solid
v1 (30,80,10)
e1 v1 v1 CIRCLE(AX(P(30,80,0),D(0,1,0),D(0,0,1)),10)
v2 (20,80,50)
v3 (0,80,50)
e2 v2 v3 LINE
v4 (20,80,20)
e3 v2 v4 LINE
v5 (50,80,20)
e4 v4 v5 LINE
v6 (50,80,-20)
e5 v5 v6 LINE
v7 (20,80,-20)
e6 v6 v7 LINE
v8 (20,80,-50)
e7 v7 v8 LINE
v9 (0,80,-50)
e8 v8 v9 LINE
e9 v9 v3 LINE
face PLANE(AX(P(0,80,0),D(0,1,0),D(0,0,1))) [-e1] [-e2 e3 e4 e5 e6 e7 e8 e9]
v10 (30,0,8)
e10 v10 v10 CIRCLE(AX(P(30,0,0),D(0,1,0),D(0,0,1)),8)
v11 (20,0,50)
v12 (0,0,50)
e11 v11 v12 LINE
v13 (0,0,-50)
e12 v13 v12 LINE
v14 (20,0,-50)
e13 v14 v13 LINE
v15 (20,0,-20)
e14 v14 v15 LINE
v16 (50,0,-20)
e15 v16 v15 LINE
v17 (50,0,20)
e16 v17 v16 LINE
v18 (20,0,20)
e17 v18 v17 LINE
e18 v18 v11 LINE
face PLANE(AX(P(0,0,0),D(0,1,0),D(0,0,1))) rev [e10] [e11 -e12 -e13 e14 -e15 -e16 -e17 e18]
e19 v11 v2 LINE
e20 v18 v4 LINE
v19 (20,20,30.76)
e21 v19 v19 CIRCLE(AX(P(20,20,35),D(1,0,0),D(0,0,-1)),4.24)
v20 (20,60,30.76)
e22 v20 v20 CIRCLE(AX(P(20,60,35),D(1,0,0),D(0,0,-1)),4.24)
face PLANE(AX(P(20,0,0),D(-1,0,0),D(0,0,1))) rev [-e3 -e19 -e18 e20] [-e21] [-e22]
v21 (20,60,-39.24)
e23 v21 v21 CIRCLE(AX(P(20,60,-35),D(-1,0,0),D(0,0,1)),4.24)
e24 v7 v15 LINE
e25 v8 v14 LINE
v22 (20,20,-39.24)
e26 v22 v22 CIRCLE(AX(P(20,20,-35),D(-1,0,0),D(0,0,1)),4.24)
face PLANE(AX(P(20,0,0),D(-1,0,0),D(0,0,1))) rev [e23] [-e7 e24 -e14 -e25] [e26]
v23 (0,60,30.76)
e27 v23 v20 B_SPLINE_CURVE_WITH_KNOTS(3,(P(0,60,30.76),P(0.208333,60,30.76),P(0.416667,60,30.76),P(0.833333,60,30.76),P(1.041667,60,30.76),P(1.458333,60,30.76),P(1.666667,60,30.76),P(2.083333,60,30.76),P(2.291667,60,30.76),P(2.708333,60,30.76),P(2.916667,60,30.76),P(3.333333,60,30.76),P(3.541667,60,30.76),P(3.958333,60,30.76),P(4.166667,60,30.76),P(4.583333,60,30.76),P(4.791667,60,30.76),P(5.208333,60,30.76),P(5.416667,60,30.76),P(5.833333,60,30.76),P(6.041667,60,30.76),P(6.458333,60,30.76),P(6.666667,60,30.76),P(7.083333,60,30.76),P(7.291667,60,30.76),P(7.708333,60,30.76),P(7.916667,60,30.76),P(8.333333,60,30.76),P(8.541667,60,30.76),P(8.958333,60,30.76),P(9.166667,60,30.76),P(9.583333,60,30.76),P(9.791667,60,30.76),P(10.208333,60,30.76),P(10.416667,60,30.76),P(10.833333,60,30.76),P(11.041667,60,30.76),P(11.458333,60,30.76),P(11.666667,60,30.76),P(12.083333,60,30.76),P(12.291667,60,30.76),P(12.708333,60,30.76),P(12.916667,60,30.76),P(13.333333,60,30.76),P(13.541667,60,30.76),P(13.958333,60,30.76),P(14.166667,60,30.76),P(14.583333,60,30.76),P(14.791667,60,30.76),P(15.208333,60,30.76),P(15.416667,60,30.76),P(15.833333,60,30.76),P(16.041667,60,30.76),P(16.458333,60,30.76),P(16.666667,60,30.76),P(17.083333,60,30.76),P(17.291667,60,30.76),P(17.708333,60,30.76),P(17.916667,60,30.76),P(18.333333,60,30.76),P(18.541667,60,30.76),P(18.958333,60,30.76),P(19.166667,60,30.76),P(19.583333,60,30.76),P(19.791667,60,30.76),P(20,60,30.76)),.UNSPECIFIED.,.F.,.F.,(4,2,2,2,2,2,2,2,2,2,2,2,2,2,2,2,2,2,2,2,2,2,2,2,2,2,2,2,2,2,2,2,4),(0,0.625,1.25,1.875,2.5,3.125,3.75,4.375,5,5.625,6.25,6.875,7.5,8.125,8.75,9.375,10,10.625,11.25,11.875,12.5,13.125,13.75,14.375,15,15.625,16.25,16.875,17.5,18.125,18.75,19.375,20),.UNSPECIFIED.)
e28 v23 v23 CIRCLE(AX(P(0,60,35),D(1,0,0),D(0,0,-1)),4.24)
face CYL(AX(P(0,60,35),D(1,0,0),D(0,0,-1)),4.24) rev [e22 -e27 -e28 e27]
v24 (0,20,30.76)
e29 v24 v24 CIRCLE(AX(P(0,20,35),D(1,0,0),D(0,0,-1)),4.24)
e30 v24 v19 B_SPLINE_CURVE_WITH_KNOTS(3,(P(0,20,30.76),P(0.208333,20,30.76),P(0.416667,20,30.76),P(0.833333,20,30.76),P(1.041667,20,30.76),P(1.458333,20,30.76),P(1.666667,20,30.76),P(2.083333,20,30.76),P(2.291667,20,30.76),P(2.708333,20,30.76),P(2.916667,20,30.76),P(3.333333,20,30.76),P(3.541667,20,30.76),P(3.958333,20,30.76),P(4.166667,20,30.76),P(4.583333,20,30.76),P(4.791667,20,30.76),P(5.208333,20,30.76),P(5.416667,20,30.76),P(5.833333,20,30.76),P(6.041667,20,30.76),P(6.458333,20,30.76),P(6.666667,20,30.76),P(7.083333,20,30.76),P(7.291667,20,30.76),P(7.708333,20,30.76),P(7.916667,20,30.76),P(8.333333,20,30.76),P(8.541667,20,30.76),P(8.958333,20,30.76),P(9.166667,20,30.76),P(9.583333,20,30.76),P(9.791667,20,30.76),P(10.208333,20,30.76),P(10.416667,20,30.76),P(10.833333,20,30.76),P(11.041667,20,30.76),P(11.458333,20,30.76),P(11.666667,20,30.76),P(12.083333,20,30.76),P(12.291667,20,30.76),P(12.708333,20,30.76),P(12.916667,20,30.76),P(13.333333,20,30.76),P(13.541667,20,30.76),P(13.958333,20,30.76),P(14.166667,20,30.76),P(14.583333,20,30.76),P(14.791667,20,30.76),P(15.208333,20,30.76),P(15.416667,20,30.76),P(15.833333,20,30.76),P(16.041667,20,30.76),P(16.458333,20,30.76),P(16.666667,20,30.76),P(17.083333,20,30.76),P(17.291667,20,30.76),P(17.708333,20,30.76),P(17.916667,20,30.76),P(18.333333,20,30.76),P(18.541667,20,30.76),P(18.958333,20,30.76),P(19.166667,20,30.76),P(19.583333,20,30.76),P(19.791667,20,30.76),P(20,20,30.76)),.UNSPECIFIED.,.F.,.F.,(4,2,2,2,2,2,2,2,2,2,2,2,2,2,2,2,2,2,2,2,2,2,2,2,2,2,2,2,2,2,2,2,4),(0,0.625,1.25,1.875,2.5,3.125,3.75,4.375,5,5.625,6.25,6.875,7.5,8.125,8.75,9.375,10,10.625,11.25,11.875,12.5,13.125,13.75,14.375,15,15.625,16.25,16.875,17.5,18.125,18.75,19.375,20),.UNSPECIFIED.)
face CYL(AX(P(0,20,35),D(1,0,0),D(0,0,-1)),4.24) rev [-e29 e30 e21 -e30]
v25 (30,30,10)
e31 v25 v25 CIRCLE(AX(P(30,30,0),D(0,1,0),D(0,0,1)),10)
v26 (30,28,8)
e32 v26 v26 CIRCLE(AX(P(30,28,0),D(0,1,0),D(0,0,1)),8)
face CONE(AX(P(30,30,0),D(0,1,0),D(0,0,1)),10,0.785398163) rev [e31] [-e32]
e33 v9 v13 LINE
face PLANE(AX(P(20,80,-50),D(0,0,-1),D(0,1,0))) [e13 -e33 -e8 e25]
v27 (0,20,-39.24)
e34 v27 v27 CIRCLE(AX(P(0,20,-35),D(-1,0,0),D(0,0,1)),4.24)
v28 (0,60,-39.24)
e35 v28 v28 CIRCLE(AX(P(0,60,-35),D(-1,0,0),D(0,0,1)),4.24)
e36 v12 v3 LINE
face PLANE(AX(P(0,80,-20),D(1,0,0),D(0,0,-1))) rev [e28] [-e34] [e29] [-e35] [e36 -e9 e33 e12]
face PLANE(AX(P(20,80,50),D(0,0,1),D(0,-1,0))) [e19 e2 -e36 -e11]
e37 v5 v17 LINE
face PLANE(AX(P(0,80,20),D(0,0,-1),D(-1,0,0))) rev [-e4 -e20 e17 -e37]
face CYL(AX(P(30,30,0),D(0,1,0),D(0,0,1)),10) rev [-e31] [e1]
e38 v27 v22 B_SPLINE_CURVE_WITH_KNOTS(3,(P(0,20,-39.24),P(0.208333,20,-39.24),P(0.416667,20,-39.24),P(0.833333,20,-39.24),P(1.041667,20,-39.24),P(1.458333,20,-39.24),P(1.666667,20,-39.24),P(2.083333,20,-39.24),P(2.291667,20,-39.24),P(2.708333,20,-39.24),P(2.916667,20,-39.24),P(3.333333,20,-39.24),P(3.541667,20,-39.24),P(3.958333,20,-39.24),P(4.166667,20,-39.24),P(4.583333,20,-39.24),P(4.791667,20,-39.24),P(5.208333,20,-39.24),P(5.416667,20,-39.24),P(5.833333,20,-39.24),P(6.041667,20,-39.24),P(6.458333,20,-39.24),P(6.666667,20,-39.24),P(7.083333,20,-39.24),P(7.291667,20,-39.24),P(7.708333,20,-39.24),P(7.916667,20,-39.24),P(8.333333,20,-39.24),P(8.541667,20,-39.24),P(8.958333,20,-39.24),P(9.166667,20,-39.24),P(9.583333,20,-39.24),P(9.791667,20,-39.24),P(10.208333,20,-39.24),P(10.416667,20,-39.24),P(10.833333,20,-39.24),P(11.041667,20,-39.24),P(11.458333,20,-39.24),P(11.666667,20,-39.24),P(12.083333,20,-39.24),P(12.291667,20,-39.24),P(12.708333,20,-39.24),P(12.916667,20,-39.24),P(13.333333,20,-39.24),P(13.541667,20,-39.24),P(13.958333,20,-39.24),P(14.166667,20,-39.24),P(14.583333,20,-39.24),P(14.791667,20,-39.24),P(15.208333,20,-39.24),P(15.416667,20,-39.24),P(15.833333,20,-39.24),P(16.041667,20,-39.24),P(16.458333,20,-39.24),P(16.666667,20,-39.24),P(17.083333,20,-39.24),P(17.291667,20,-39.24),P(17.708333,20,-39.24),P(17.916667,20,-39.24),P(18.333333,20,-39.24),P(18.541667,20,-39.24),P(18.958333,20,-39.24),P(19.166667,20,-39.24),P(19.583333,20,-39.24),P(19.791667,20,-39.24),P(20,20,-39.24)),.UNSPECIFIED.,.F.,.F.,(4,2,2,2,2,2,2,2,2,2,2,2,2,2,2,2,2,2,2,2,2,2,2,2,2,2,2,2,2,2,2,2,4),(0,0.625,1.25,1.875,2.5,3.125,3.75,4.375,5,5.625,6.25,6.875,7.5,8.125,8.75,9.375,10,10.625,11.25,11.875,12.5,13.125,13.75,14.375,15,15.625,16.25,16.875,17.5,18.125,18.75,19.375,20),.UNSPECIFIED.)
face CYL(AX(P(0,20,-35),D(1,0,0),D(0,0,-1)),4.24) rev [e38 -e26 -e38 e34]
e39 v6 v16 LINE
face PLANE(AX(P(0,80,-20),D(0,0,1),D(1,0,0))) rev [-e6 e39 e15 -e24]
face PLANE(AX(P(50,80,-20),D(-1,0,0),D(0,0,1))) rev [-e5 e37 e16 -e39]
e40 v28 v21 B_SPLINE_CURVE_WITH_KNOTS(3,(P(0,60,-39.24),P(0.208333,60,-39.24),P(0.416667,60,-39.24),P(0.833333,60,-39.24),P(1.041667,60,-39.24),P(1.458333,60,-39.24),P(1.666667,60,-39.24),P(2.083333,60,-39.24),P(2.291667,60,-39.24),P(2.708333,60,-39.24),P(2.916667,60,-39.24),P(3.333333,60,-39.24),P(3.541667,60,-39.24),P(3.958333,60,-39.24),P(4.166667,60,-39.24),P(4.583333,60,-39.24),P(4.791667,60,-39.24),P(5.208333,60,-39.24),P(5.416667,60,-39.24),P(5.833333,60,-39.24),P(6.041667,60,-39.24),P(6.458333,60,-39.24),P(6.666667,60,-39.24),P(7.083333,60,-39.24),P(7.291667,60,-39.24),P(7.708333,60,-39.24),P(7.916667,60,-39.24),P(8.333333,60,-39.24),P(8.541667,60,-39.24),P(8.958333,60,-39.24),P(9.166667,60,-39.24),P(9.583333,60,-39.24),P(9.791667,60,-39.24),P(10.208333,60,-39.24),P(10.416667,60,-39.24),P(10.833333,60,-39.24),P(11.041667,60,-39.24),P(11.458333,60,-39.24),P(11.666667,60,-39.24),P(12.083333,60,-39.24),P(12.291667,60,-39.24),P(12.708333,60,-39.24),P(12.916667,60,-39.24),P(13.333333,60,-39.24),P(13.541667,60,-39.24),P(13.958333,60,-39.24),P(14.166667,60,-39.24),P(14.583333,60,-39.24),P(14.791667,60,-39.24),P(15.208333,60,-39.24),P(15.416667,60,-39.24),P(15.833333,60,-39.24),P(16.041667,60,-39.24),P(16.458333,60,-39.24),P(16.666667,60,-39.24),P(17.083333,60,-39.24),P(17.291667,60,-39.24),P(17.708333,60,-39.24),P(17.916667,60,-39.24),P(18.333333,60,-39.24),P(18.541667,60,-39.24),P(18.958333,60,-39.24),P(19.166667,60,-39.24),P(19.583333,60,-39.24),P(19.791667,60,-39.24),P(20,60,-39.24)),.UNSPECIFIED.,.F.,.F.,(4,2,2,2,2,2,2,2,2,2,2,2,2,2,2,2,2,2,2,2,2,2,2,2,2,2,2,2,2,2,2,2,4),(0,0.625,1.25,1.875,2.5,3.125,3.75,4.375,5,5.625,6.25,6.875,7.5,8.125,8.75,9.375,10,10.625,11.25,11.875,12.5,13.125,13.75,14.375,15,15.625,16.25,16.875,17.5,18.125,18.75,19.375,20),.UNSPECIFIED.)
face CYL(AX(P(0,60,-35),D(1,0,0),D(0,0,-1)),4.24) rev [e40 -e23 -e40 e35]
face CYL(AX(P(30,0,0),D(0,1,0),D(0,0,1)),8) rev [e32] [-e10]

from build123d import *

# Parameters (mm, degrees)
SKETCH1_W           = 50
SKETCH1_H           = 40
BOSS_EXTRUDE1_DEPTH = 80
SKETCH4_W           = 100
SKETCH4_H           = 80
BOSS_EXTRUDE2_DEPTH = 20
SKETCH5_R           = 4.24
SCREW_HOLE_DEPTH    = 99.994949366
SKETCH6_R           = 8
ROD_HOLE_DEPTH      = 107.77078252
SKETCH7_R           = 10
CUT_EXTRUDE5_DEPTH  = 50
CHAMFER2_SIZE       = 2


with BuildPart() as part:
    # Sketch1 → Boss-Extrude1 (new body)
    with BuildSketch(Plane(origin=(0, 0, 0), x_dir=(1, 0, 0), z_dir=(0, 1, 0))):
        with Locations((25, 0)):
            Rectangle(SKETCH1_W, SKETCH1_H)
    extrude(amount=BOSS_EXTRUDE1_DEPTH)

    # Sketch4 → Boss-Extrude2 (add)
    with BuildSketch(Plane.ZY):
        with Locations((0, 40)):
            Rectangle(SKETCH4_W, SKETCH4_H)
    extrude(amount=-BOSS_EXTRUDE2_DEPTH)

    # Sketch5 → screw hole (cut, through all)
    with BuildSketch(Plane(origin=(20, 0, 0), x_dir=(0, 0, -1), z_dir=(1, 0, 0))):
        with Locations((-35, 20)):
            Circle(SKETCH5_R)
        with Locations((-35, 60)):
            Circle(SKETCH5_R)
    screw_hole = extrude(amount=-SCREW_HOLE_DEPTH, mode=Mode.SUBTRACT)

    # Mirror1: screw hole across plane
    add(screw_hole.mirror(Plane.XY), mode=Mode.SUBTRACT)

    # Sketch6 → rod hole (cut, through all)
    with BuildSketch(Plane(origin=(0, 80, 0), x_dir=(1, 0, 0), z_dir=(0, 1, 0))):
        with Locations(Location((30, 0, 0), (0, 0, 270))):
            Circle(SKETCH6_R)
    extrude(amount=-ROD_HOLE_DEPTH, mode=Mode.SUBTRACT)

    # Sketch7 → Cut-Extrude5 (cut)
    with BuildSketch(Plane(origin=(0, 80, 0), x_dir=(1, 0, 0), z_dir=(0, 1, 0))):
        with Locations(Location((30, 0, 0), (0, 0, 270))):
            Circle(SKETCH7_R)
    extrude(amount=-CUT_EXTRUDE5_DEPTH, mode=Mode.SUBTRACT)

    # Chamfer2
    chamfer2_edges = [part.edges().sort_by_distance(p)[0] for p in [
        (30, 30, -8),
    ]]
    chamfer(chamfer2_edges, length=CHAMFER2_SIZE - 0.0001)  # a hair under: the kernel refuses the full size


solid = part.part
